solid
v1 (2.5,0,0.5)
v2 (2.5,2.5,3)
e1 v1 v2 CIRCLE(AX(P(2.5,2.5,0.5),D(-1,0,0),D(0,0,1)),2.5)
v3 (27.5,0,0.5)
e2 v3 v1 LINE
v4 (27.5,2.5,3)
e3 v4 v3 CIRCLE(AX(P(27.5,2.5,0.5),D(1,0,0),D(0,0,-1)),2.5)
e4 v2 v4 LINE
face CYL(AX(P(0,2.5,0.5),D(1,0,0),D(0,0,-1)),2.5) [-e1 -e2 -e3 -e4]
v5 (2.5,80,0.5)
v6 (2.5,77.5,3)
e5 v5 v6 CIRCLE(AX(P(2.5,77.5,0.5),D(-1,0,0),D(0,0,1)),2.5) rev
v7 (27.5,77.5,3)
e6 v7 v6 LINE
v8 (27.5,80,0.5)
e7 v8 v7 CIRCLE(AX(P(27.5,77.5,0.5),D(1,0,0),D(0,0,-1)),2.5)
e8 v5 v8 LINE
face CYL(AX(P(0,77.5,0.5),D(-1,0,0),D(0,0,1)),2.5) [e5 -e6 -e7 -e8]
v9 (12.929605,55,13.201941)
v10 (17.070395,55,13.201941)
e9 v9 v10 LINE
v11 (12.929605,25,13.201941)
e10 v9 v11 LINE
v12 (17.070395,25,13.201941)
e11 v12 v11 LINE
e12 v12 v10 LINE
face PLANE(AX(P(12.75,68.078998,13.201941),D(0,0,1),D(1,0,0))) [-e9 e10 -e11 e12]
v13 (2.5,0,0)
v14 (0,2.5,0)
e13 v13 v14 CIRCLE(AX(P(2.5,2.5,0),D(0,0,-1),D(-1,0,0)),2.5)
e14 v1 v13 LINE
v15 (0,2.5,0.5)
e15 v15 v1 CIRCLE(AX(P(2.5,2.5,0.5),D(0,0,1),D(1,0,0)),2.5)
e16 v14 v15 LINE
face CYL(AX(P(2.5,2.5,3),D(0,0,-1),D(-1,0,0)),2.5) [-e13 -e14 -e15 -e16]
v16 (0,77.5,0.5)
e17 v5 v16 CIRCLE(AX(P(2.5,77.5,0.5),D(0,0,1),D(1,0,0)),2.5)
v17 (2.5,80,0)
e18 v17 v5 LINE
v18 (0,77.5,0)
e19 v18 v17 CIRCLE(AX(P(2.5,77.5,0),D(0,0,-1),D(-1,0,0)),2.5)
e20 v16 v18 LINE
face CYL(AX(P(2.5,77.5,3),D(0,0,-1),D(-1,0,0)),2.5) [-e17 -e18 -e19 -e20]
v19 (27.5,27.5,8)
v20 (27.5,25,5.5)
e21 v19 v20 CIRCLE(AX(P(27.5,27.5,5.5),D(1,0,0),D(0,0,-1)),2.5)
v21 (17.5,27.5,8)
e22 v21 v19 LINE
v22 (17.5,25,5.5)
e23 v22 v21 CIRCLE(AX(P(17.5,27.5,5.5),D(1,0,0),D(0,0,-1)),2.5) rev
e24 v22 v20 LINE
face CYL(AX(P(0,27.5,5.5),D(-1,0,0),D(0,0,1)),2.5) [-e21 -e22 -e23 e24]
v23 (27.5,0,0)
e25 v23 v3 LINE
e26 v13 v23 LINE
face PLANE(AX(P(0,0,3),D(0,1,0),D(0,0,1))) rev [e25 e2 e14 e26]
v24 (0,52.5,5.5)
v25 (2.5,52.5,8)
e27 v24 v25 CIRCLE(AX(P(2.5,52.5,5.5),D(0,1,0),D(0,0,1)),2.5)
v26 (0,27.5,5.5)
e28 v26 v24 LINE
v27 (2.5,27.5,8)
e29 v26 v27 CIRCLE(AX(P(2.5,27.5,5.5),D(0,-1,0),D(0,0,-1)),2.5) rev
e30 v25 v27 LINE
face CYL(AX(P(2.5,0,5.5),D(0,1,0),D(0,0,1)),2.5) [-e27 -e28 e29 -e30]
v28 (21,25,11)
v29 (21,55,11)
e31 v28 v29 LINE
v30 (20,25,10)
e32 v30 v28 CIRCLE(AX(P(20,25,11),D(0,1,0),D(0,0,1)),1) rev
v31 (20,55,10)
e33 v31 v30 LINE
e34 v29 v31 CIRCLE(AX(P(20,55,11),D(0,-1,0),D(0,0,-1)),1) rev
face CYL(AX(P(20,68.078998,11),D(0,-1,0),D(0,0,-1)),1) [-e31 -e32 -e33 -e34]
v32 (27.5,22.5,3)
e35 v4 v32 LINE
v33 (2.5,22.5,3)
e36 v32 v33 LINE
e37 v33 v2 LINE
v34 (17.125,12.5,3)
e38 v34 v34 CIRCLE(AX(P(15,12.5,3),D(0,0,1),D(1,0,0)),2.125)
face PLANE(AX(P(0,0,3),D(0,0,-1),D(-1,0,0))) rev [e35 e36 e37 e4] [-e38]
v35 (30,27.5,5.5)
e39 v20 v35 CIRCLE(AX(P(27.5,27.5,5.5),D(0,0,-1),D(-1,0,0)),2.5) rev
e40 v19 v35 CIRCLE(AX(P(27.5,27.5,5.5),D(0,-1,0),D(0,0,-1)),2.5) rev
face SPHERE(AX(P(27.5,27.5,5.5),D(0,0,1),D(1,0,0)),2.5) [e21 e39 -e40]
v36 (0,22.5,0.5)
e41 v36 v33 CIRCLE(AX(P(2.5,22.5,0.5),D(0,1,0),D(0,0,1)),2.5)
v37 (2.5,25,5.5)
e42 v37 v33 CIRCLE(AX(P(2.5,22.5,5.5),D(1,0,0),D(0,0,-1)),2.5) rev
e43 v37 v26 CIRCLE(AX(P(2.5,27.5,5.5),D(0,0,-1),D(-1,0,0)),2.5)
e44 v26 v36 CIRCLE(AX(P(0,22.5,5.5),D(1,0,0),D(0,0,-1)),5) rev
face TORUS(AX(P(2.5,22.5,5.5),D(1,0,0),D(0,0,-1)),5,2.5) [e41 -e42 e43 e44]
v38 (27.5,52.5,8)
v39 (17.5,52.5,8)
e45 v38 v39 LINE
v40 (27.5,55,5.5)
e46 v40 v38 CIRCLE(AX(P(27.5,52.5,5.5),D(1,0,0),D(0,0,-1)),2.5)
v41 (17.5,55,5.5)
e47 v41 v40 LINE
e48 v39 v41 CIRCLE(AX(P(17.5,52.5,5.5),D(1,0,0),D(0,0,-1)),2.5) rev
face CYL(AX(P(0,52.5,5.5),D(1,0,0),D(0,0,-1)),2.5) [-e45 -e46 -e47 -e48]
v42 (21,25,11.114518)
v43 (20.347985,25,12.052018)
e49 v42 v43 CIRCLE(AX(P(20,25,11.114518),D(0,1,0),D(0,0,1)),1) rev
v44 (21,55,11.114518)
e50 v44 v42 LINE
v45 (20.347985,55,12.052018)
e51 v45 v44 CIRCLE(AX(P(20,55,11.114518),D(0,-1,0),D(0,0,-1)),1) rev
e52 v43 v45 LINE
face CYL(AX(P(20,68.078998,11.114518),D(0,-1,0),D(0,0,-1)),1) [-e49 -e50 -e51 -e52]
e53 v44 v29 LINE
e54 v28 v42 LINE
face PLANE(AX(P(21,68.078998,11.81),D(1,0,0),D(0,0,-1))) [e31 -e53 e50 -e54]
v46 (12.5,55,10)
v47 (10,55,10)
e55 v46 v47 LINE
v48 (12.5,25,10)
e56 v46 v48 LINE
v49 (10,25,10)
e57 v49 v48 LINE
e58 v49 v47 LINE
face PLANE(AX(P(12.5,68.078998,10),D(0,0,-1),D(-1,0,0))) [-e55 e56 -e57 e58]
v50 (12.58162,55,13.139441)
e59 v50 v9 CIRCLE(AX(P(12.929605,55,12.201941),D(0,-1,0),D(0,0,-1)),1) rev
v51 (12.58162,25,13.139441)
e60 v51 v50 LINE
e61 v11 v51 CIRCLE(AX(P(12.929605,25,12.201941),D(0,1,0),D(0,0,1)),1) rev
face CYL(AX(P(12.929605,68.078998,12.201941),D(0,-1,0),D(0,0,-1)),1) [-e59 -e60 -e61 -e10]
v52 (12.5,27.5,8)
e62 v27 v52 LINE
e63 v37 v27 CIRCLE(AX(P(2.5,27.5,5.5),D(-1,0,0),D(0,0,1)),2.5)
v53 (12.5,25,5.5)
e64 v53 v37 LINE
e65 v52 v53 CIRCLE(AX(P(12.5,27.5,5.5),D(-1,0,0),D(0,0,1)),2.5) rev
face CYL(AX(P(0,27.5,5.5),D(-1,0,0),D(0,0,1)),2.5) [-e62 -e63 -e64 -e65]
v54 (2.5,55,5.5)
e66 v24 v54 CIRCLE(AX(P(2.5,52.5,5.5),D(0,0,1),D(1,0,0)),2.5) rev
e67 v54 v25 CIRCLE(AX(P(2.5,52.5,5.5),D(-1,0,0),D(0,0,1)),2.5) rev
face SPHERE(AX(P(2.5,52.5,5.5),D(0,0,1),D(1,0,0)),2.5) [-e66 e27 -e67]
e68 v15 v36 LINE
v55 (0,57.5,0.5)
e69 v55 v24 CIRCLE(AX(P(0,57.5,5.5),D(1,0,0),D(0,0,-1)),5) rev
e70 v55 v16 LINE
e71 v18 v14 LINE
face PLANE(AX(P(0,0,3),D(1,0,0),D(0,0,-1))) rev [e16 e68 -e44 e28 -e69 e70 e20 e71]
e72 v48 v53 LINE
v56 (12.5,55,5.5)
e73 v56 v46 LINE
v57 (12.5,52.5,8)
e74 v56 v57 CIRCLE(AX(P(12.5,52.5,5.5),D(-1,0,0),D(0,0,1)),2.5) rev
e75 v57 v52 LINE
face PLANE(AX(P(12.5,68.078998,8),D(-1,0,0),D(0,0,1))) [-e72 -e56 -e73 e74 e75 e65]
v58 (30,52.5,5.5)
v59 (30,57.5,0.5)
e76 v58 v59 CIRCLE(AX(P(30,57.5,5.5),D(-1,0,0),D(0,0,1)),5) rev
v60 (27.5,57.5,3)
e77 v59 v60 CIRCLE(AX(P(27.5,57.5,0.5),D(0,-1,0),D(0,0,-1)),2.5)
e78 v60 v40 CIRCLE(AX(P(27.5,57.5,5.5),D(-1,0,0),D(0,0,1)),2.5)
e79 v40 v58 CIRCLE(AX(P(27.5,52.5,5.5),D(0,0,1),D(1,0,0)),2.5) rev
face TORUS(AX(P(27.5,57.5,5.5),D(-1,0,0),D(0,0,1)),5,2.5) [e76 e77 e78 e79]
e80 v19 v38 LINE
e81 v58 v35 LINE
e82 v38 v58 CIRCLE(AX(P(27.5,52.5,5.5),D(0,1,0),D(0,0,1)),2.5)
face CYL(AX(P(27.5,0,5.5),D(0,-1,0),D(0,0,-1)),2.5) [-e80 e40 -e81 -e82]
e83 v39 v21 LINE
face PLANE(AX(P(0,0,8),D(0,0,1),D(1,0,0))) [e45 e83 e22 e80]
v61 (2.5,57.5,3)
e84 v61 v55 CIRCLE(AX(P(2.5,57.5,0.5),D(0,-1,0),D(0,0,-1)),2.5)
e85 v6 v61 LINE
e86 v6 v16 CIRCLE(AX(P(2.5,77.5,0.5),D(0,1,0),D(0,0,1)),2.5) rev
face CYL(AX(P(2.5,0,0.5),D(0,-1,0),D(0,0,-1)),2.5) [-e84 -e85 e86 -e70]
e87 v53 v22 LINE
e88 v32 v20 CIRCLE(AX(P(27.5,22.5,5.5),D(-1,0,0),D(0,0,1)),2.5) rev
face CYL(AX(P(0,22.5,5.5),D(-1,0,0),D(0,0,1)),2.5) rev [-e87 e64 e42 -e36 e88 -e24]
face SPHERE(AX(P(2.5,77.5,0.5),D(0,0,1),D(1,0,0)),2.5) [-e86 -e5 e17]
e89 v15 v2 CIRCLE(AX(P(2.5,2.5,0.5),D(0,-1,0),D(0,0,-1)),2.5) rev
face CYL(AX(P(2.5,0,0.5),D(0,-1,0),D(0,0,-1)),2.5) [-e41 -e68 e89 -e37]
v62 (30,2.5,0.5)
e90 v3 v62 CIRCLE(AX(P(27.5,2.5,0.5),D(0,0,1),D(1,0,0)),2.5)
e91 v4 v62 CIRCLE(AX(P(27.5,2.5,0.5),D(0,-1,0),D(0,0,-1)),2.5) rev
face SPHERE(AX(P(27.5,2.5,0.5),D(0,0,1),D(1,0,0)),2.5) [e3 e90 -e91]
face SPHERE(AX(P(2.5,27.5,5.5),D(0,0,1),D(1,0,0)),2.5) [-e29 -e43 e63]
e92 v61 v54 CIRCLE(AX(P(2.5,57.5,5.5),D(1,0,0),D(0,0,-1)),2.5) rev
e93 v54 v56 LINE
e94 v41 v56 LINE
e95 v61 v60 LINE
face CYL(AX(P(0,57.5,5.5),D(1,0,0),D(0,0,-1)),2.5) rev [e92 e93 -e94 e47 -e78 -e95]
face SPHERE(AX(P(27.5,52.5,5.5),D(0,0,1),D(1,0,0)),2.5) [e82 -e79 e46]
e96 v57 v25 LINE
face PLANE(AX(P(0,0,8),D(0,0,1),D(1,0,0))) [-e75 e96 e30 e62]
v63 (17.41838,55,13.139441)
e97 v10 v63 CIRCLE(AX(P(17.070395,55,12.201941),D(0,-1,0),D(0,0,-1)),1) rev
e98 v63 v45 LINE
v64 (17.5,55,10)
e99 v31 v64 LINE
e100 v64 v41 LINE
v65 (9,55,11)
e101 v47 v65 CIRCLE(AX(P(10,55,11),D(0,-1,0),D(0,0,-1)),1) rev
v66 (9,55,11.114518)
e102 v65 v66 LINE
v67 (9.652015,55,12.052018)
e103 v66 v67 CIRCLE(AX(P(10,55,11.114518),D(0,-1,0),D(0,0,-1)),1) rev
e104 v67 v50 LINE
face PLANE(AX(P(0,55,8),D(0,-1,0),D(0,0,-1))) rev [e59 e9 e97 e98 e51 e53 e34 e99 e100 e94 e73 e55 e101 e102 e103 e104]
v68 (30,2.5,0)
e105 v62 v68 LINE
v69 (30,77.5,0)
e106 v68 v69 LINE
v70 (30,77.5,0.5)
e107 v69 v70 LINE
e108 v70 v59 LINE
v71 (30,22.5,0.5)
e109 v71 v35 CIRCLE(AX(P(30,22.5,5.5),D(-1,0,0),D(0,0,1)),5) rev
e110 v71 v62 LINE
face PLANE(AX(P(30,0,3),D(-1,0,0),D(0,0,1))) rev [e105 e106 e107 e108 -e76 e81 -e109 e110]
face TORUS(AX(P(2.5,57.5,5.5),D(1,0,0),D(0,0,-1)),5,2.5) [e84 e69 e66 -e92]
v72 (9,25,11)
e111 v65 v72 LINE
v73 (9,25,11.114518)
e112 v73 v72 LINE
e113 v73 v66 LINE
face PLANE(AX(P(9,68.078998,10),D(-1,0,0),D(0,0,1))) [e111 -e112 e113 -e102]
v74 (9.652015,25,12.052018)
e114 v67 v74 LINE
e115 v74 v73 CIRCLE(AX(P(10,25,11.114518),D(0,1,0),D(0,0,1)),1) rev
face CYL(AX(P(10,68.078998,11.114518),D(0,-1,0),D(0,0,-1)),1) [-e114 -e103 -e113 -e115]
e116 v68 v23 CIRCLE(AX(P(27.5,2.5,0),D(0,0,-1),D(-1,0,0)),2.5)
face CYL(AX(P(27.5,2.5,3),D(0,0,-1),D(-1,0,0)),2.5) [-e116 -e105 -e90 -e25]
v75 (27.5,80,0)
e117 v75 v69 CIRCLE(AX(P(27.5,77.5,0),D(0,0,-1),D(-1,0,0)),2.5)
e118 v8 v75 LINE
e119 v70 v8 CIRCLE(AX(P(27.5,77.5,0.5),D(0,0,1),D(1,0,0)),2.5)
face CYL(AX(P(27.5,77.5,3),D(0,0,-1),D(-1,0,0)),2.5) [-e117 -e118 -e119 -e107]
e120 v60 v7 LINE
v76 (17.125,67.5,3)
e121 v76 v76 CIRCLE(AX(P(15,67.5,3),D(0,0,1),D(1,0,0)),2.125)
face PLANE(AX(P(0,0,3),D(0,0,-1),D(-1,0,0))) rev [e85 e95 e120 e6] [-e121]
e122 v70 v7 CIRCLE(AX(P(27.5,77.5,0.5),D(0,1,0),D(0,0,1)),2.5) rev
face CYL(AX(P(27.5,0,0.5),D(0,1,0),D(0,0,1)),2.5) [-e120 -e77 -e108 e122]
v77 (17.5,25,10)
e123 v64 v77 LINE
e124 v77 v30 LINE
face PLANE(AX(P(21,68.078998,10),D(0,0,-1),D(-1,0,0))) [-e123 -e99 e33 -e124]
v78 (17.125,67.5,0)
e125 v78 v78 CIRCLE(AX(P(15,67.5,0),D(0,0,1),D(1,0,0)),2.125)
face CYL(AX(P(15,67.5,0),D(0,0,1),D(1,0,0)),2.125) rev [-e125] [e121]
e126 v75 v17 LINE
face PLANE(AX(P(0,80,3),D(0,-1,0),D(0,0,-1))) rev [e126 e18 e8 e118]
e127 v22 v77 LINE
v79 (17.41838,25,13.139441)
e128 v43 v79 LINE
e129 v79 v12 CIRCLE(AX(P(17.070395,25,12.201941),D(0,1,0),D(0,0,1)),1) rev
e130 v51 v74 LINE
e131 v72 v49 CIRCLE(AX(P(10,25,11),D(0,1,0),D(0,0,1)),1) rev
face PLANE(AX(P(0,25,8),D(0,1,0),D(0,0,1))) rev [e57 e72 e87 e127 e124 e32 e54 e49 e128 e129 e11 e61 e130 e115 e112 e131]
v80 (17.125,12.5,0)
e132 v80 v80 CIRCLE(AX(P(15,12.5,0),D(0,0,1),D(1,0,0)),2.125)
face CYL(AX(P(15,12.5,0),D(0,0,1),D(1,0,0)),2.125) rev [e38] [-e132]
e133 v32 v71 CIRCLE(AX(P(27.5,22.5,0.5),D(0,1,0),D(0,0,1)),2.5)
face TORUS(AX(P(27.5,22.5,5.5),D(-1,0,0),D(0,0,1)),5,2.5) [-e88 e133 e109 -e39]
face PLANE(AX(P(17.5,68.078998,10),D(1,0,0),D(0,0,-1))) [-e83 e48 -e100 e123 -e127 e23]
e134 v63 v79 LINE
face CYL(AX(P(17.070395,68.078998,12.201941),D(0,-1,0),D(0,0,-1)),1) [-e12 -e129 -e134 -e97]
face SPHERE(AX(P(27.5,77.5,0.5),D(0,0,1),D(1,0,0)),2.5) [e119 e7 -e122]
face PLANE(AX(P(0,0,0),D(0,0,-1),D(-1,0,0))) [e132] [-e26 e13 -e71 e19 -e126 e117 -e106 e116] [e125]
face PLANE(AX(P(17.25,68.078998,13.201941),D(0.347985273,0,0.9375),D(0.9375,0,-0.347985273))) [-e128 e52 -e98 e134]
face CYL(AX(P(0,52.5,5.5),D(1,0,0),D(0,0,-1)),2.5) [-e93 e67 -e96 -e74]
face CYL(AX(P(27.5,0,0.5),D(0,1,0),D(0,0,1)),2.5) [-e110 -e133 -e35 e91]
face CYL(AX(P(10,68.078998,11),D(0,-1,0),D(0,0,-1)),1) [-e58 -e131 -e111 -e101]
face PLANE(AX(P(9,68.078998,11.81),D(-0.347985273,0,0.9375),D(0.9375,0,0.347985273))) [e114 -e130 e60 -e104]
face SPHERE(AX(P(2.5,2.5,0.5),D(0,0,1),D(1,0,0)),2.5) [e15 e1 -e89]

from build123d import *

# Parameters (mm, degrees)
ESQUISSE1_W             = 30
ESQUISSE1_H             = 80
BOSS_EXTRU_1_DEPTH      = 3
ESQUISSE2_R             = 2.125
ENL_V_MAT_EXTRU_1_DEPTH = 3
ESQUISSE3_W             = 30
ESQUISSE3_H             = 30
BOSS_EXTRU_2_DEPTH      = 5
BOSS_EXTRU_3_DEPTH      = 30
CONG_1_R                = 1
CONG_2_R                = 2.5


with BuildPart() as part:
    # Esquisse1 → Boss.-Extru.1 (new body)
    with BuildSketch(Plane.XY):
        with Locations((15, 40)):
            Rectangle(ESQUISSE1_W, ESQUISSE1_H)
    extrude(amount=BOSS_EXTRU_1_DEPTH)

    # Esquisse2 → Enlèv. mat.-Extru.1 (cut)
    with BuildSketch(Plane.XY.offset(3)):
        with Locations((15, 67.5)):
            Circle(ESQUISSE2_R)
        with Locations((15, 12.5)):
            Circle(ESQUISSE2_R)
    extrude(amount=-ENL_V_MAT_EXTRU_1_DEPTH, mode=Mode.SUBTRACT)

    # Esquisse3 → Boss.-Extru.2 (add)
    with BuildSketch(Plane.XY.offset(3)):
        with Locations((15, 40)):
            Rectangle(ESQUISSE3_W, ESQUISSE3_H)
    extrude(amount=BOSS_EXTRU_2_DEPTH)

    # Esquisse4 → Boss.-Extru.3 (add)
    with BuildSketch(Plane(origin=(0, 25, 0), x_dir=(-1, 0, 0), z_dir=(0, -1, 0))):
        Polygon((-12.5, -8), (-12.5, -10), (-9, -10), (-9, -11.81), (-12.75, -13.201941091), (-17.25, -13.201941091), (-21, -11.81), (-21, -10), (-17.5, -10), (-17.5, -8), align=None)
    extrude(amount=-BOSS_EXTRU_3_DEPTH)

    # Congé1
    cong_1_edges = [part.edges().sort_by_distance(p)[0] for p in [
        (9, 40, 10),
        (9, 40, 11.81),
        (12.75, 40, 13.201941091),
        (17.25, 40, 13.201941091),
        (21, 40, 11.81),
        (21, 40, 10),
    ]]
    fillet(cong_1_edges, radius=CONG_1_R)

    # Congé2
    cong_2_edges = [part.edges().sort_by_distance(p)[0] for p in [
        (15, 55, 3),
        (15, 25, 3),
    ]]
    fillet(cong_2_edges, radius=CONG_2_R)
    cong_2_2_edges = [part.edges().sort_by_distance(p)[0] for p in [
        (0, 0, 1.5),
        (30, 40, 8),
        (0, 40, 8),
        (30, 80, 1.5),
        (0, 80, 1.5),
        (15, 80, 3),
        (30, 68.75, 3),
        (0, 68.75, 3),
        (30, 0, 1.5),
        (15, 0, 3),
        (0, 11.25, 3),
        (30, 11.25, 3),
        (23.75, 25, 8),
        (6.25, 25, 8),
        (23.75, 55, 8),
        (6.25, 55, 8),
        (30, 24.267766953, 3.732233047),
        (0, 24.267766953, 3.732233047),
        (0, 55.732233047, 3.732233047),
        (30, 55.732233047, 3.732233047),
    ]]
    fillet(cong_2_2_edges, radius=CONG_2_R - 0.0001)  # a hair under: the kernel refuses the full size


solid = part.part
